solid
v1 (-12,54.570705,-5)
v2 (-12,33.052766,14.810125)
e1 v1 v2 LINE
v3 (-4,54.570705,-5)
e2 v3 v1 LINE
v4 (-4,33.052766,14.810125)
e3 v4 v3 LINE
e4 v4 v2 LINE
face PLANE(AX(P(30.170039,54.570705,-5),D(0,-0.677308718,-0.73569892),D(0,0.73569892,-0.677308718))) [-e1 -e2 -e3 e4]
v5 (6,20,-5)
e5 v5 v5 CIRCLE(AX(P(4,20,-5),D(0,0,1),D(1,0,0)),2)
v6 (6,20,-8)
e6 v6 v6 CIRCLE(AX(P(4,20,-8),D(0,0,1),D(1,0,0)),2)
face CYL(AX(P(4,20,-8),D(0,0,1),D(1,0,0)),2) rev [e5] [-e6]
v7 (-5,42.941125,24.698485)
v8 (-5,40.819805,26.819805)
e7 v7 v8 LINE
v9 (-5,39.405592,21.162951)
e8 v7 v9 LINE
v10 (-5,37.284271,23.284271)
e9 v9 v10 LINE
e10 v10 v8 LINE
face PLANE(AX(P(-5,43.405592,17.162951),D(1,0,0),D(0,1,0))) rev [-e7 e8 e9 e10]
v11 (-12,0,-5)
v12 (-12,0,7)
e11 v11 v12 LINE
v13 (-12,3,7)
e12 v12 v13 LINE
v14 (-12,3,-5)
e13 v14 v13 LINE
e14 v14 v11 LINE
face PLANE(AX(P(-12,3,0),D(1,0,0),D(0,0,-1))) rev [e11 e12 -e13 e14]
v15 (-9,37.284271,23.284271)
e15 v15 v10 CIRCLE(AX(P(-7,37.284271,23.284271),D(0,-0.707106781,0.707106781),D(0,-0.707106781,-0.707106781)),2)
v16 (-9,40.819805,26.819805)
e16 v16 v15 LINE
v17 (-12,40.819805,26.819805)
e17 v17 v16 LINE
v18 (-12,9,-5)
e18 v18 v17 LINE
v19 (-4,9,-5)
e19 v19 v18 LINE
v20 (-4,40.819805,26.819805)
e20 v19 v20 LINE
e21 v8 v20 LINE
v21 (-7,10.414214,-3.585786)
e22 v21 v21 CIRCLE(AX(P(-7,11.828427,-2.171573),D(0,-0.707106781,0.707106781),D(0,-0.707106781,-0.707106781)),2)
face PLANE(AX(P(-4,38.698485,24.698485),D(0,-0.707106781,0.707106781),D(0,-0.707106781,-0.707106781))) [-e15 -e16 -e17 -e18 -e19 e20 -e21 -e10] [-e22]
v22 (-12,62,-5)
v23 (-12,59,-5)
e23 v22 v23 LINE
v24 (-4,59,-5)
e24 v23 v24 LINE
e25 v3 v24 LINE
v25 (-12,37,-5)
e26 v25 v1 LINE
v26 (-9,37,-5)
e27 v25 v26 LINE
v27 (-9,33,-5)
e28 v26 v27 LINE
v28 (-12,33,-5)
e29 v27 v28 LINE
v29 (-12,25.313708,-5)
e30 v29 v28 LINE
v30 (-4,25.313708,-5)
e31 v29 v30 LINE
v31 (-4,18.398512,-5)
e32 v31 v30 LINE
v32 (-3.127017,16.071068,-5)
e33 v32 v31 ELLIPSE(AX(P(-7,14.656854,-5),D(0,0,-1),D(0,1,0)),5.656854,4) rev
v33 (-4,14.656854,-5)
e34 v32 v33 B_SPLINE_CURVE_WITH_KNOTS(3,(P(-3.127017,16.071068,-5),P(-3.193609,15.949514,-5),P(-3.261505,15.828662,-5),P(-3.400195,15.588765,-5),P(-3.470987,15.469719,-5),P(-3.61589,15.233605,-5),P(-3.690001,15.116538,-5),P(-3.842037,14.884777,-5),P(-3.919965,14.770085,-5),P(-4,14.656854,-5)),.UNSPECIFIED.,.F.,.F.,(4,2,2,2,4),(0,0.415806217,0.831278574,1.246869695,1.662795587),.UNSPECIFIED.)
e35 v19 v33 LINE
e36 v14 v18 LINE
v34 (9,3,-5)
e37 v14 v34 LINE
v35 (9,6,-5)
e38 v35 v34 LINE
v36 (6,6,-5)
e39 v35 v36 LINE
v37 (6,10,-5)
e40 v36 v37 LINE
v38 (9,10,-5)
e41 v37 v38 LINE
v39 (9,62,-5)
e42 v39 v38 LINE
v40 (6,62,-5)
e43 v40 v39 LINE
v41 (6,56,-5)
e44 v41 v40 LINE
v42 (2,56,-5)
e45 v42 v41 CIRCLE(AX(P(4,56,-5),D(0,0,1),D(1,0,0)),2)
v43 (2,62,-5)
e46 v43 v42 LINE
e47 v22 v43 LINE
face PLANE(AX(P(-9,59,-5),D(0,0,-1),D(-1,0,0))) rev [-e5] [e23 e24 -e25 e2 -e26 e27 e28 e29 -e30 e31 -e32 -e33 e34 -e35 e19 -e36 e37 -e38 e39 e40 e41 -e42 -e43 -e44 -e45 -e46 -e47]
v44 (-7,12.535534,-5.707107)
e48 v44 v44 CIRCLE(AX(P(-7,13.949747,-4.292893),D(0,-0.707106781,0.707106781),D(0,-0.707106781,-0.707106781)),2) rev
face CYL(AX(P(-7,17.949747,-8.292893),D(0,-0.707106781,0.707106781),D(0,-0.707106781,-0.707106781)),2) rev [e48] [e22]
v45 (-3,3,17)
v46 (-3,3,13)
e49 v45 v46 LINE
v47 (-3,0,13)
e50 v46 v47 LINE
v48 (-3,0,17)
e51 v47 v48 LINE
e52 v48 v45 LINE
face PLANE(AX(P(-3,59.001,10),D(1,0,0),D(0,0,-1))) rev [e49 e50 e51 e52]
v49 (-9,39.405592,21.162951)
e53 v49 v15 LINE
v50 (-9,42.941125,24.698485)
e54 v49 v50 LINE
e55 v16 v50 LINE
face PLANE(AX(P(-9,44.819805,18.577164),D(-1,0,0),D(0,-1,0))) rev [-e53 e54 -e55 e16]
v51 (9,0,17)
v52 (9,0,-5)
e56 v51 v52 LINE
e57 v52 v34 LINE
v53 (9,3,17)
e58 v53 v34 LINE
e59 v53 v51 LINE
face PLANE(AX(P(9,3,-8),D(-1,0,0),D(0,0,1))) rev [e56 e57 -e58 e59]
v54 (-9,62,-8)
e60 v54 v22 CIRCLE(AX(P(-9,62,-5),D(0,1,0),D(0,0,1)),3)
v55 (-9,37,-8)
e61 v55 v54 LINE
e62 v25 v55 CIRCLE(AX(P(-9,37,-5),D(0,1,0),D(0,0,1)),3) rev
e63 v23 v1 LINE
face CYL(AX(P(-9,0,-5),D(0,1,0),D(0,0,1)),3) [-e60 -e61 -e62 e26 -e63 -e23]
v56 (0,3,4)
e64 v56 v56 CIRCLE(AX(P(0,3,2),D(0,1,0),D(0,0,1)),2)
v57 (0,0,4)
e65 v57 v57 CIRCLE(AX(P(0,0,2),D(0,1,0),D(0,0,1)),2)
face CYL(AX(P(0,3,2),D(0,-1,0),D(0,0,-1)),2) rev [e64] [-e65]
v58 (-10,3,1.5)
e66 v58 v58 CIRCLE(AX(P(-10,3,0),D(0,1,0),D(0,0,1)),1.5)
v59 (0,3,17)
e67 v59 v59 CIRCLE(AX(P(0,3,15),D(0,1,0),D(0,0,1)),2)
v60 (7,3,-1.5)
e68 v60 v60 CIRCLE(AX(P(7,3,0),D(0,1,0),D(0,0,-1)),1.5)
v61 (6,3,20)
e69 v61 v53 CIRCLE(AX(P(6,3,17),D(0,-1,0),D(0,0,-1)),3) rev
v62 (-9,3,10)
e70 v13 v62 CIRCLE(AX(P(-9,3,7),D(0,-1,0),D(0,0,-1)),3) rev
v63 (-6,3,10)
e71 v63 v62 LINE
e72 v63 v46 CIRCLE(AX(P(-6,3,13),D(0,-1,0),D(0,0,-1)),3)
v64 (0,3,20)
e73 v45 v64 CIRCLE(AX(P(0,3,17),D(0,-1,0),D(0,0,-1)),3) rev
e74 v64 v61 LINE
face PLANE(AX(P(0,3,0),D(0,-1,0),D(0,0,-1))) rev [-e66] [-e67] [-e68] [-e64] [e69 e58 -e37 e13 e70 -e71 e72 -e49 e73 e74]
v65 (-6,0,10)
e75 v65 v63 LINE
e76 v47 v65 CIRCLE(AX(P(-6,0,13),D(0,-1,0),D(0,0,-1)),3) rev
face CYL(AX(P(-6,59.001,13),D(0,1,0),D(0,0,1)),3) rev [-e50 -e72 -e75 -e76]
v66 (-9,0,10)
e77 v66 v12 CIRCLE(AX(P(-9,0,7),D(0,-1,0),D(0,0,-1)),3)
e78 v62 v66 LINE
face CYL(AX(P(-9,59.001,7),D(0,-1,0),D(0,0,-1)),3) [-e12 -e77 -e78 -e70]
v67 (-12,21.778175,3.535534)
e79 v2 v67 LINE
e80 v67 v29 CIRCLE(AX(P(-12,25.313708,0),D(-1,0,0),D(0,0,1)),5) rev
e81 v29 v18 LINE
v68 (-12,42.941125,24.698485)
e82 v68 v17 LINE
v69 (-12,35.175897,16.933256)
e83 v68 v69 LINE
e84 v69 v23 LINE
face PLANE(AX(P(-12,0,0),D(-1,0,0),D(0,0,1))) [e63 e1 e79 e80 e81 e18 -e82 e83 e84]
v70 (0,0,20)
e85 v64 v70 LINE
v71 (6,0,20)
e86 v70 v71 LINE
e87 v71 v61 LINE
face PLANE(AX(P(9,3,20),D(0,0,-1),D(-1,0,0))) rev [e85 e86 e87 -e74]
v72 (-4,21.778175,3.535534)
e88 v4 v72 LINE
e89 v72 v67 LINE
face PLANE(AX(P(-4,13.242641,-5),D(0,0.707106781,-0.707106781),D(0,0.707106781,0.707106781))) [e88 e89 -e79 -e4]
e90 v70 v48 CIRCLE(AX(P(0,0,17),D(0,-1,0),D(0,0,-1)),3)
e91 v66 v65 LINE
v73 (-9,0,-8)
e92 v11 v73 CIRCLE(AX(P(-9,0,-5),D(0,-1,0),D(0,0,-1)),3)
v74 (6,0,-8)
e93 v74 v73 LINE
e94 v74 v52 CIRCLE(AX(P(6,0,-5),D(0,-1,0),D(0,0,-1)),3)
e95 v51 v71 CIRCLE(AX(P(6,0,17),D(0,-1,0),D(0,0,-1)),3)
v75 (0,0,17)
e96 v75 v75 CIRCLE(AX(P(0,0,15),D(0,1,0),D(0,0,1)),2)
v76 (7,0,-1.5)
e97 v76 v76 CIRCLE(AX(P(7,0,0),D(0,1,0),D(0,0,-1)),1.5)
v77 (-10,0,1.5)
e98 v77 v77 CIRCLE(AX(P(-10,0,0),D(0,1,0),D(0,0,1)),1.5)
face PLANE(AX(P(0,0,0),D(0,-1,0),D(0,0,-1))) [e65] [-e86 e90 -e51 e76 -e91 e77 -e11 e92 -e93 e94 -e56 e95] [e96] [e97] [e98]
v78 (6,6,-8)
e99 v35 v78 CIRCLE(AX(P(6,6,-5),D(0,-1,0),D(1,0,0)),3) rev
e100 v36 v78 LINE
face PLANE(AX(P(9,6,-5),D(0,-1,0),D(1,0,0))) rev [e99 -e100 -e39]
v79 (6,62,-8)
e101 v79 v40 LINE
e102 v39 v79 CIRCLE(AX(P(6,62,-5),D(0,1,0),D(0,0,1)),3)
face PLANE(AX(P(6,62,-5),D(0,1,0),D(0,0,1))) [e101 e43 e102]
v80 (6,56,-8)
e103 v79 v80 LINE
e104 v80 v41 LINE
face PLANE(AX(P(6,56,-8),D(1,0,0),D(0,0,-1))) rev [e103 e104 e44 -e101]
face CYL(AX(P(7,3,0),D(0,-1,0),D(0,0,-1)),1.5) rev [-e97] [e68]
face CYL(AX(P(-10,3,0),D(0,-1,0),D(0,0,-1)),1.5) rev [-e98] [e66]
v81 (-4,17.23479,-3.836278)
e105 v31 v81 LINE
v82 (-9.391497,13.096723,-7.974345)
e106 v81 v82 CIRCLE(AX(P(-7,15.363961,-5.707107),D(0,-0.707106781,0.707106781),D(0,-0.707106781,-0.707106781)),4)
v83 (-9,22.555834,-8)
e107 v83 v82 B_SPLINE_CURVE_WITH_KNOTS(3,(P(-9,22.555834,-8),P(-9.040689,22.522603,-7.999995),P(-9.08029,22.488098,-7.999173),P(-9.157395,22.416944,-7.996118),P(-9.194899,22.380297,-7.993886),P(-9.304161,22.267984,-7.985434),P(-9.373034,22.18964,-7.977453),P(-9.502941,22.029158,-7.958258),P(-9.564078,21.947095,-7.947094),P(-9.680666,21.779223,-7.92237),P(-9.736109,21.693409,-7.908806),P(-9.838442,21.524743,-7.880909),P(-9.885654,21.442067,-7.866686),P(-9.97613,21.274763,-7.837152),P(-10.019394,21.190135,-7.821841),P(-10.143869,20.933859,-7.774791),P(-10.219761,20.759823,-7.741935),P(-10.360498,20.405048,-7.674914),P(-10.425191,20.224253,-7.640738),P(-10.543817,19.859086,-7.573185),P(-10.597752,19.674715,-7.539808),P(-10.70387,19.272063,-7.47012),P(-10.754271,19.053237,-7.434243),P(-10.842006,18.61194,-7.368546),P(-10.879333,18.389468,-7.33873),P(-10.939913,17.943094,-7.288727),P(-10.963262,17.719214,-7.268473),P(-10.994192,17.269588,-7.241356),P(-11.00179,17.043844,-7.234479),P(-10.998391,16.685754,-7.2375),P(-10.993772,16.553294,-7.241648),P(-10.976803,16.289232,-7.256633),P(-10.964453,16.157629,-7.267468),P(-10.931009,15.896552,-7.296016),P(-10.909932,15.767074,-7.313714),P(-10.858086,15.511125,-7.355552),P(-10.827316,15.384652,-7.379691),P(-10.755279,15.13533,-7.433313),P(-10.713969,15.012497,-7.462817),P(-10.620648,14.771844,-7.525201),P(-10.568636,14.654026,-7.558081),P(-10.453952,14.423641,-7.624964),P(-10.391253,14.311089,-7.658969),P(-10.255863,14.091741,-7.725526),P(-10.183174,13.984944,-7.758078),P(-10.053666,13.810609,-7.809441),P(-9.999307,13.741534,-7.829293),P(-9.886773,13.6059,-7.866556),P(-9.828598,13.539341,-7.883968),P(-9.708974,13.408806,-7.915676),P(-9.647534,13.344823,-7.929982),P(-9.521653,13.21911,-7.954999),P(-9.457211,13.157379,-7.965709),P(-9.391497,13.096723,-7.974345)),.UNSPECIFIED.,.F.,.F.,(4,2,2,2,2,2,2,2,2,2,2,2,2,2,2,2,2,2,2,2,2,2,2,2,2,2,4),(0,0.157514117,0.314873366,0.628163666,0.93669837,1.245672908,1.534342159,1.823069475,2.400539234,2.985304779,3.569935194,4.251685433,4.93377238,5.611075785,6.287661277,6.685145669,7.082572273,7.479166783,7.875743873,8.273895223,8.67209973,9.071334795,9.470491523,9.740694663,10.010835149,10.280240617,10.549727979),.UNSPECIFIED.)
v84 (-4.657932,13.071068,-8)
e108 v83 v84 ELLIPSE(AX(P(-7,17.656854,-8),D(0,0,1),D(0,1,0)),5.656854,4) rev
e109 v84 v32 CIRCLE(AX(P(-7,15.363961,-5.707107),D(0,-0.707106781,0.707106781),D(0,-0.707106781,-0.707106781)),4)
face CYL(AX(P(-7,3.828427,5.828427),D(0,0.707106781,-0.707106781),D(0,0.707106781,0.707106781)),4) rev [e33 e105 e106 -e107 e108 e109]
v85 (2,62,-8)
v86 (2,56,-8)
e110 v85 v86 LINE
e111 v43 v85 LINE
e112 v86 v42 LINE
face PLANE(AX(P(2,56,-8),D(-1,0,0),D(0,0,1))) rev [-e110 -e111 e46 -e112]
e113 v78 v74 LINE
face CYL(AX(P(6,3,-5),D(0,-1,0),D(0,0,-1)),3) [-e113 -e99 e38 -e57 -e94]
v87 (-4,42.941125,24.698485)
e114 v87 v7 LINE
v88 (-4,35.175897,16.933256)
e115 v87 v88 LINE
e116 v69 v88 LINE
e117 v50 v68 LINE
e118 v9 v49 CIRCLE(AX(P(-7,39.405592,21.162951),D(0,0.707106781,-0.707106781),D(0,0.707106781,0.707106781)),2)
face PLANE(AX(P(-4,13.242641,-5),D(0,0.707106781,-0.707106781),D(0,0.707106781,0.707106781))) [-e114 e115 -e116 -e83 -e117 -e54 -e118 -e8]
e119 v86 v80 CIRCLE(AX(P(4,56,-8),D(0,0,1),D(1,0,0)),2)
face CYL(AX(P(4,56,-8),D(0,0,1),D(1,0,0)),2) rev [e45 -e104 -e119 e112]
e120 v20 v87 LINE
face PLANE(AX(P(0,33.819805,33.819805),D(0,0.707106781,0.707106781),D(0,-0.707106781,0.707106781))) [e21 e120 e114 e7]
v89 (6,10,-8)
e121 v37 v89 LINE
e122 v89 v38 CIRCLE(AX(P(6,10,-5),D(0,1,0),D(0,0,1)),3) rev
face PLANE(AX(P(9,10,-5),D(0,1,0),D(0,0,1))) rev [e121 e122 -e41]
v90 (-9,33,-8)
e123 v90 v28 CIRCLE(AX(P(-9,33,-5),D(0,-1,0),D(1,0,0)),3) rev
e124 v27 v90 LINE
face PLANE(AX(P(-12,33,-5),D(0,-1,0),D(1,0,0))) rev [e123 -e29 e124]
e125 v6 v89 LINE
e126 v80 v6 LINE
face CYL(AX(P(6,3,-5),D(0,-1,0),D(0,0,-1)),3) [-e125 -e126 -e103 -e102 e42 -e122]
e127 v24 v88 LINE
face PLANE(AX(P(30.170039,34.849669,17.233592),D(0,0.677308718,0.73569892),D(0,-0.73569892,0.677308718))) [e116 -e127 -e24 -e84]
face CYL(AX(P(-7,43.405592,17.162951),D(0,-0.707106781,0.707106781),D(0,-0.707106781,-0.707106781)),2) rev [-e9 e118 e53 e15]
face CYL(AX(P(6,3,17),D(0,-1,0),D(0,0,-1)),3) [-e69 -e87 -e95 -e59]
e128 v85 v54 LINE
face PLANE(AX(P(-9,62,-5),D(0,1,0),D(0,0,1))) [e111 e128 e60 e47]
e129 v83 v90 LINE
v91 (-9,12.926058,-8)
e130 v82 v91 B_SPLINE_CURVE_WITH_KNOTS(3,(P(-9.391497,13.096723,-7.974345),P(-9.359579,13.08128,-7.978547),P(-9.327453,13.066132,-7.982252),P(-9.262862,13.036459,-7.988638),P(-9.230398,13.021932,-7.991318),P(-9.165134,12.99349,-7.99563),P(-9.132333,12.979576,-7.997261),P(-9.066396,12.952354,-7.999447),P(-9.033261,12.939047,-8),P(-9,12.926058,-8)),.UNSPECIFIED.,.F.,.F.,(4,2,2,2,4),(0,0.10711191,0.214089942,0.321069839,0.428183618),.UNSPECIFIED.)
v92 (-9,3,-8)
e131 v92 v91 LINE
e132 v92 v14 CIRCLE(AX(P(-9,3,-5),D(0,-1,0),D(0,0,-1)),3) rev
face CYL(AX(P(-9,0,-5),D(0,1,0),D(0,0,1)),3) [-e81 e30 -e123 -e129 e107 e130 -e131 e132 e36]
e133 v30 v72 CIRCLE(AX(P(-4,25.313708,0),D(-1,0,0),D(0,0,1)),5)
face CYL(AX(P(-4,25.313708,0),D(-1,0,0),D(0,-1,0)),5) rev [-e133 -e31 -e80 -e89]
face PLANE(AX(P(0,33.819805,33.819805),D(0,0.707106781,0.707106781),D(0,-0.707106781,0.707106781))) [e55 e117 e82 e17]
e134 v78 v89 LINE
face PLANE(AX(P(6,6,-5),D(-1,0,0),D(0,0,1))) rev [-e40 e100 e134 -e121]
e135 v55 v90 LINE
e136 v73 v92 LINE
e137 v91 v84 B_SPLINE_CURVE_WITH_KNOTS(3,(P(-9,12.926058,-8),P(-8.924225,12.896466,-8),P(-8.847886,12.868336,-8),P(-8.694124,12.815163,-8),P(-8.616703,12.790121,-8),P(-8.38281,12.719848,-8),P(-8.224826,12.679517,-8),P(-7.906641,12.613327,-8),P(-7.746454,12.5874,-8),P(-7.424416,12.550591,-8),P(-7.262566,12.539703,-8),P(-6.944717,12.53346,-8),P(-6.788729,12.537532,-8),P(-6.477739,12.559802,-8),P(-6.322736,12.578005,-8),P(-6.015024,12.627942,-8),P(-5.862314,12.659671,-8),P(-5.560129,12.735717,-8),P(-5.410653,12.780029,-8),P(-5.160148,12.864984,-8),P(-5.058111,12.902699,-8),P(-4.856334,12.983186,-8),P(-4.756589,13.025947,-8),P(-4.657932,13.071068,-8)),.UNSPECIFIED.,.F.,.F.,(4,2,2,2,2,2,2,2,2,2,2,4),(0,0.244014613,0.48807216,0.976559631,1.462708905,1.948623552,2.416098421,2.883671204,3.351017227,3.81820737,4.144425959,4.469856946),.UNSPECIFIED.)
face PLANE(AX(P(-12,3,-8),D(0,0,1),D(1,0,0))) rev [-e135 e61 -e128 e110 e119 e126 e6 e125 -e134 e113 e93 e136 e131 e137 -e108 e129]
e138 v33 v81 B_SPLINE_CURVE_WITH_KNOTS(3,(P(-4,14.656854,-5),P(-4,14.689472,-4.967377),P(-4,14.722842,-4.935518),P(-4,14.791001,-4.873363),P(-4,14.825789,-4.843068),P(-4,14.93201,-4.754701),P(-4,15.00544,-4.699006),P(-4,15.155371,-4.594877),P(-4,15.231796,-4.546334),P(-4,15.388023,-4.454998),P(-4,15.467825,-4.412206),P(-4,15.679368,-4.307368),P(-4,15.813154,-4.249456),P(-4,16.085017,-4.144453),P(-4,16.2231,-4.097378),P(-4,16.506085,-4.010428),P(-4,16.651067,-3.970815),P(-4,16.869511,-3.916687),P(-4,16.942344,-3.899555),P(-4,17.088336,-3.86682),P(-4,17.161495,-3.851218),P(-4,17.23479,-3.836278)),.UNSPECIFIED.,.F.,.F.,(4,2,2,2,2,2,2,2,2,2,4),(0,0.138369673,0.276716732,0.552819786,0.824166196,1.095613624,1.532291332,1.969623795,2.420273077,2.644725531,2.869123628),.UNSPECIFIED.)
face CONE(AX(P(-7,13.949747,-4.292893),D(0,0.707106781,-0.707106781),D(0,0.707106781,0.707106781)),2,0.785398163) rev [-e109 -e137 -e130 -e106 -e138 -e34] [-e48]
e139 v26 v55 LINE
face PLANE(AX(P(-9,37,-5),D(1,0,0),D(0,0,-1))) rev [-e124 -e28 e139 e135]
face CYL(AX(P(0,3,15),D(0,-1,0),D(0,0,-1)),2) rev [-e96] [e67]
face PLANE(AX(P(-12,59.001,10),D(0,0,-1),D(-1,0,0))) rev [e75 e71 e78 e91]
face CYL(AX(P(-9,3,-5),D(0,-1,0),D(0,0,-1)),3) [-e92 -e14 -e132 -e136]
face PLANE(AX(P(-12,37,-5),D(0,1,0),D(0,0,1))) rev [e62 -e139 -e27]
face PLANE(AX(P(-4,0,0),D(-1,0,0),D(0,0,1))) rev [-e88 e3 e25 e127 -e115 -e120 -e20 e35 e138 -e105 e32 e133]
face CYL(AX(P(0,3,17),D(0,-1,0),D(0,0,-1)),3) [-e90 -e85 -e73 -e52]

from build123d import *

# Parameters (mm, degrees)
SKETCH_1_R          = 2
SKETCH_1_R_2        = 1.5
EXTRUDE_1_DEPTH     = 3
SKETCH_3_W          = 18
SKETCH_3_H          = 3
EXTRUDE_3_DEPTH     = 56
SKETCH_4_R          = 2
CUT_EXTRUDE_1_DEPTH = 66.192024052
FILLET_1_R          = 3
EXTRUDE_4_DEPTH     = 8
SKETCH_8_R          = 2
CUT_EXTRUDE_4_DEPTH = 2
FILLET_2_R          = 3
FILLET_3_R          = 5
EXTRUDE_5_DEPTH     = 8
SKETCH_10_R         = 2
CUT_EXTRUDE_5_DEPTH = 63.070878351
SKETCH_11_R         = 4
CUT_EXTRUDE_6_DEPTH = 15
CUT_EXTRUDE_7_REACH = 67.077
SKETCH_13_W         = 9
SKETCH_13_H         = 10
FILLET_4_R          = 3
SKETCH_14_W         = 4
SKETCH_14_H         = 4.648660845
CUT_EXTRUDE_8_DEPTH = 68.134194076
CHAMFER_1_SIZE      = 2
SKETCH_15_W         = 1
SKETCH_15_H         = 3
SKETCH_15_W_2       = 3
EXTRUDE_6_DEPTH     = 3
EXTRUDE_7_DEPTH     = 3
SKETCH_18_W         = 3
SKETCH_18_H         = 4
CUT_EXTRUDE_9_DEPTH = 3


# Some blends are built 0.0001 mm under size
with BuildPart() as part:
    # 草图1 → 凸台-拉伸1 (new body)
    with BuildSketch(Plane(origin=(0, 0, 0), x_dir=(1, 0, 0), z_dir=(0, 1, 0))):
        Polygon((-12, 0), (-12, 8), (9, 8), (9, -20), (0, -20), (-12, -20), align=None)
        with Locations(Location((0, -15, 0), (0, 0, 270))):
            Circle(SKETCH_1_R, mode=Mode.SUBTRACT)
        with Locations(Location((-10, 0, 0), (0, 0, 270))):
            Circle(SKETCH_1_R_2, mode=Mode.SUBTRACT)
        with Locations(Location((0, -2, 0), (0, 0, 270))):
            Circle(SKETCH_1_R, mode=Mode.SUBTRACT)
        with Locations(Location((7, 0, 0), (0, 0, 90))):
            Circle(SKETCH_1_R_2, mode=Mode.SUBTRACT)
    extrude(amount=EXTRUDE_1_DEPTH)

    # 草图3 → 凸台-拉伸3 (add)
    with BuildSketch(Plane(origin=(0, 3, 0), x_dir=(1, 0, 0), z_dir=(0, 1, 0))):
        with Locations((0, 6.5)):
            Rectangle(SKETCH_3_W, SKETCH_3_H)
    extrude(amount=EXTRUDE_3_DEPTH)

    # 草图4 → 切除-拉伸1 (cut, through all)
    with BuildSketch(Plane.XY.offset(-5)):
        with Locations((4, 56)):
            Circle(SKETCH_4_R)
        with Locations((4, 20)):
            Circle(SKETCH_4_R)
    extrude(amount=-CUT_EXTRUDE_1_DEPTH, mode=Mode.SUBTRACT)

    # 圆角1
    fillet_1_edges = [part.edges().sort_by_distance(p)[0] for p in [
        (-12, 1.5, -8),
        (-12, 1.5, 20),
        (9, 1.5, 20),
        (9, 29.5, -8),
    ]]
    fillet(fillet_1_edges, radius=FILLET_1_R - 0.0001)  # a hair under: the kernel refuses the full size

    # 草图5 → 凸台-拉伸4 (add)
    with BuildSketch(Plane.ZY.offset(12)):
        Polygon((-5, 13.242640687), (22.577164466, 40.819805153), (24.69848481, 38.69848481), (-5, 9), (-5, 3), (-8, 3), (-8, 59), (-5, 59), align=None)
    extrude(amount=-EXTRUDE_4_DEPTH)

    # 草图8 → 切除-拉伸4 (cut)
    with BuildSketch(Plane(origin=(0, 7, -7), x_dir=(1, 0, 0), z_dir=(0, -0.7071067811865512, 0.7071067811865438))):
        with Locations(Location((-7, 6.828427125, 0), (0, 0, 270))):
            Circle(SKETCH_8_R)
        with BuildLine():
            Line((-5, 42.828427125), (-5, 44.828427125))
            Line((-5, 44.828427125), (-9, 44.828427125))
            Line((-9, 44.828427125), (-9, 42.828427125))
            ThreePointArc((-9, 42.828427125), (-7, 40.828427125), (-5, 42.828427125))
        make_face()
    extrude(amount=-CUT_EXTRUDE_4_DEPTH, mode=Mode.SUBTRACT)

    # 圆角2
    fillet_2_edges = [part.edges().sort_by_distance(p)[0] for p in [
        (-12, 31, -8),
    ]]
    fillet(fillet_2_edges, radius=FILLET_2_R - 0.0001)  # a hair under: the kernel refuses the full size

    # 圆角3
    fillet_3_edges = [part.edges().sort_by_distance(p)[0] for p in [
        (-8, 13.242640687, -5),
    ]]
    fillet(fillet_3_edges, radius=FILLET_3_R)

    # 草图9 → 凸台-拉伸5 (add)
    with BuildSketch(Plane.ZY.offset(12)):
        Polygon((14.8101253, 33.052765987), (17.233592146, 34.849668975), (-5, 59), (-5, 54.570705171), align=None)
    extrude(amount=-EXTRUDE_5_DEPTH)

    # 草图10 → 切除-拉伸5 (cut, through all)
    with BuildSketch(Plane(origin=(0, 7, -7), x_dir=(1, 0, 0), z_dir=(0, -0.7071067811865509, 0.7071067811865441))):
        with Locations(Location((-7, 6.828427125, 0), (0, 0, 270))):
            Circle(SKETCH_10_R)
        with BuildLine():
            Line((-5, 42.828427125), (-5, 44.828427125))
            Line((-5, 44.828427125), (-9, 44.828427125))
            Line((-9, 44.828427125), (-9, 42.828427125))
            ThreePointArc((-9, 42.828427125), (-7, 40.828427125), (-5, 42.828427125))
        make_face()
    extrude(amount=-CUT_EXTRUDE_5_DEPTH, mode=Mode.SUBTRACT)

    # 草图11 → 切除-拉伸6 (cut)
    with BuildSketch(Plane(origin=(0, 21.142135624, -21.142135624), x_dir=(-1, 0, 0), z_dir=(0, -0.7071067811865509, 0.7071067811865441))):
        with Locations((7, -6.828427125)):
            Circle(SKETCH_11_R)
    extrude(amount=CUT_EXTRUDE_6_DEPTH, mode=Mode.SUBTRACT)

    # 草图13 → 切除-拉伸7 (cut, up to next)
    with BuildSketch(Plane.XZ, mode=Mode.PRIVATE) as cut_extrude_7_sk1:
        with Locations((-7.5, 15)):
            Rectangle(SKETCH_13_W, SKETCH_13_H)
    cut_extrude_7_tool1 = extrude(cut_extrude_7_sk1.sketch, amount=-CUT_EXTRUDE_7_REACH, mode=Mode.PRIVATE) & part.part
    add(cut_extrude_7_tool1.solids().sort_by_distance((-7.5, 0, 15))[0], mode=Mode.SUBTRACT)

    # 圆角4
    fillet_4_edges = [part.edges().sort_by_distance(p)[0] for p in [
        (-3, 1.5, 10),
        (-3, 1.5, 20),
        (-12, 1.5, 10),
    ]]
    fillet(fillet_4_edges, radius=FILLET_4_R)

    # 草图14 → 切除-拉伸8 (cut, through all)
    with BuildSketch(Plane.XY.offset(-5)):
        with Locations((4, 58.324330422)):
            Rectangle(SKETCH_14_W, SKETCH_14_H)
    extrude(amount=-CUT_EXTRUDE_8_DEPTH, mode=Mode.SUBTRACT)

    # 倒角1
    # the kernel refuses this chamfer: 2 mm, written as the material it takes off along each edge
    with BuildSketch(Plane(origin=(-7, 15.363961031, -5.707106781), x_dir=(0, -0.7071067811865436, -0.7071067811865516), z_dir=(-1, 0, 0))) as chamfer_1_piece_1:
        Polygon((2 + CHAMFER_1_SIZE, 0), (2, CHAMFER_1_SIZE), (2, 0), align=None)
    revolve(axis=Axis((-7, 15.363961031, -5.707106781), (0, -0.7071067811865512, 0.7071067811865438)), mode=Mode.SUBTRACT)

    # 草图15 → 凸台-拉伸6 (add)
    with BuildSketch(Plane(origin=(0, 31.69848481, 31.69848481), x_dir=(1, 0, 0), z_dir=(0, 0.707106781186543, 0.7071067811865521))):
        with Locations((-4.5, 11.399494937)):
            Rectangle(SKETCH_15_W, SKETCH_15_H)
        with Locations((-10.5, 11.399494937)):
            Rectangle(SKETCH_15_W_2, SKETCH_15_H)
    extrude(amount=EXTRUDE_6_DEPTH)

    # 草图16 → 凸台-拉伸7 (add)
    with BuildSketch(Plane(origin=(0, 59, 0), x_dir=(1, 0, 0), z_dir=(0, 1, 0))):
        with BuildLine():
            Line((-4, 5), (2, 5))
            Line((2, 5), (2, 8))
            Line((2, 8), (-9, 8))
            ThreePointArc((-9, 8), (-11.121320344, 7.121320344), (-12, 5))
            Line((-12, 5), (-4, 5))
        make_face()
        with BuildLine():
            Line((6, 8), (6, 5))
            Line((6, 5), (9, 5))
            ThreePointArc((9, 5), (8.121320344, 7.121320344), (6, 8))
        make_face()
    extrude(amount=EXTRUDE_7_DEPTH)

    # 草图18 → 切除-拉伸9 (cut)
    with BuildSketch(Plane(origin=(0, 0, -8), x_dir=(-1, 0, 0), z_dir=(0, 0, -1))):
        with Locations((10.5, 35)):
            Rectangle(SKETCH_18_W, SKETCH_18_H)
        with Locations((-7.5, 8)):
            Rectangle(SKETCH_18_W, SKETCH_18_H)
    extrude(amount=-CUT_EXTRUDE_9_DEPTH, mode=Mode.SUBTRACT)


solid = part.part
